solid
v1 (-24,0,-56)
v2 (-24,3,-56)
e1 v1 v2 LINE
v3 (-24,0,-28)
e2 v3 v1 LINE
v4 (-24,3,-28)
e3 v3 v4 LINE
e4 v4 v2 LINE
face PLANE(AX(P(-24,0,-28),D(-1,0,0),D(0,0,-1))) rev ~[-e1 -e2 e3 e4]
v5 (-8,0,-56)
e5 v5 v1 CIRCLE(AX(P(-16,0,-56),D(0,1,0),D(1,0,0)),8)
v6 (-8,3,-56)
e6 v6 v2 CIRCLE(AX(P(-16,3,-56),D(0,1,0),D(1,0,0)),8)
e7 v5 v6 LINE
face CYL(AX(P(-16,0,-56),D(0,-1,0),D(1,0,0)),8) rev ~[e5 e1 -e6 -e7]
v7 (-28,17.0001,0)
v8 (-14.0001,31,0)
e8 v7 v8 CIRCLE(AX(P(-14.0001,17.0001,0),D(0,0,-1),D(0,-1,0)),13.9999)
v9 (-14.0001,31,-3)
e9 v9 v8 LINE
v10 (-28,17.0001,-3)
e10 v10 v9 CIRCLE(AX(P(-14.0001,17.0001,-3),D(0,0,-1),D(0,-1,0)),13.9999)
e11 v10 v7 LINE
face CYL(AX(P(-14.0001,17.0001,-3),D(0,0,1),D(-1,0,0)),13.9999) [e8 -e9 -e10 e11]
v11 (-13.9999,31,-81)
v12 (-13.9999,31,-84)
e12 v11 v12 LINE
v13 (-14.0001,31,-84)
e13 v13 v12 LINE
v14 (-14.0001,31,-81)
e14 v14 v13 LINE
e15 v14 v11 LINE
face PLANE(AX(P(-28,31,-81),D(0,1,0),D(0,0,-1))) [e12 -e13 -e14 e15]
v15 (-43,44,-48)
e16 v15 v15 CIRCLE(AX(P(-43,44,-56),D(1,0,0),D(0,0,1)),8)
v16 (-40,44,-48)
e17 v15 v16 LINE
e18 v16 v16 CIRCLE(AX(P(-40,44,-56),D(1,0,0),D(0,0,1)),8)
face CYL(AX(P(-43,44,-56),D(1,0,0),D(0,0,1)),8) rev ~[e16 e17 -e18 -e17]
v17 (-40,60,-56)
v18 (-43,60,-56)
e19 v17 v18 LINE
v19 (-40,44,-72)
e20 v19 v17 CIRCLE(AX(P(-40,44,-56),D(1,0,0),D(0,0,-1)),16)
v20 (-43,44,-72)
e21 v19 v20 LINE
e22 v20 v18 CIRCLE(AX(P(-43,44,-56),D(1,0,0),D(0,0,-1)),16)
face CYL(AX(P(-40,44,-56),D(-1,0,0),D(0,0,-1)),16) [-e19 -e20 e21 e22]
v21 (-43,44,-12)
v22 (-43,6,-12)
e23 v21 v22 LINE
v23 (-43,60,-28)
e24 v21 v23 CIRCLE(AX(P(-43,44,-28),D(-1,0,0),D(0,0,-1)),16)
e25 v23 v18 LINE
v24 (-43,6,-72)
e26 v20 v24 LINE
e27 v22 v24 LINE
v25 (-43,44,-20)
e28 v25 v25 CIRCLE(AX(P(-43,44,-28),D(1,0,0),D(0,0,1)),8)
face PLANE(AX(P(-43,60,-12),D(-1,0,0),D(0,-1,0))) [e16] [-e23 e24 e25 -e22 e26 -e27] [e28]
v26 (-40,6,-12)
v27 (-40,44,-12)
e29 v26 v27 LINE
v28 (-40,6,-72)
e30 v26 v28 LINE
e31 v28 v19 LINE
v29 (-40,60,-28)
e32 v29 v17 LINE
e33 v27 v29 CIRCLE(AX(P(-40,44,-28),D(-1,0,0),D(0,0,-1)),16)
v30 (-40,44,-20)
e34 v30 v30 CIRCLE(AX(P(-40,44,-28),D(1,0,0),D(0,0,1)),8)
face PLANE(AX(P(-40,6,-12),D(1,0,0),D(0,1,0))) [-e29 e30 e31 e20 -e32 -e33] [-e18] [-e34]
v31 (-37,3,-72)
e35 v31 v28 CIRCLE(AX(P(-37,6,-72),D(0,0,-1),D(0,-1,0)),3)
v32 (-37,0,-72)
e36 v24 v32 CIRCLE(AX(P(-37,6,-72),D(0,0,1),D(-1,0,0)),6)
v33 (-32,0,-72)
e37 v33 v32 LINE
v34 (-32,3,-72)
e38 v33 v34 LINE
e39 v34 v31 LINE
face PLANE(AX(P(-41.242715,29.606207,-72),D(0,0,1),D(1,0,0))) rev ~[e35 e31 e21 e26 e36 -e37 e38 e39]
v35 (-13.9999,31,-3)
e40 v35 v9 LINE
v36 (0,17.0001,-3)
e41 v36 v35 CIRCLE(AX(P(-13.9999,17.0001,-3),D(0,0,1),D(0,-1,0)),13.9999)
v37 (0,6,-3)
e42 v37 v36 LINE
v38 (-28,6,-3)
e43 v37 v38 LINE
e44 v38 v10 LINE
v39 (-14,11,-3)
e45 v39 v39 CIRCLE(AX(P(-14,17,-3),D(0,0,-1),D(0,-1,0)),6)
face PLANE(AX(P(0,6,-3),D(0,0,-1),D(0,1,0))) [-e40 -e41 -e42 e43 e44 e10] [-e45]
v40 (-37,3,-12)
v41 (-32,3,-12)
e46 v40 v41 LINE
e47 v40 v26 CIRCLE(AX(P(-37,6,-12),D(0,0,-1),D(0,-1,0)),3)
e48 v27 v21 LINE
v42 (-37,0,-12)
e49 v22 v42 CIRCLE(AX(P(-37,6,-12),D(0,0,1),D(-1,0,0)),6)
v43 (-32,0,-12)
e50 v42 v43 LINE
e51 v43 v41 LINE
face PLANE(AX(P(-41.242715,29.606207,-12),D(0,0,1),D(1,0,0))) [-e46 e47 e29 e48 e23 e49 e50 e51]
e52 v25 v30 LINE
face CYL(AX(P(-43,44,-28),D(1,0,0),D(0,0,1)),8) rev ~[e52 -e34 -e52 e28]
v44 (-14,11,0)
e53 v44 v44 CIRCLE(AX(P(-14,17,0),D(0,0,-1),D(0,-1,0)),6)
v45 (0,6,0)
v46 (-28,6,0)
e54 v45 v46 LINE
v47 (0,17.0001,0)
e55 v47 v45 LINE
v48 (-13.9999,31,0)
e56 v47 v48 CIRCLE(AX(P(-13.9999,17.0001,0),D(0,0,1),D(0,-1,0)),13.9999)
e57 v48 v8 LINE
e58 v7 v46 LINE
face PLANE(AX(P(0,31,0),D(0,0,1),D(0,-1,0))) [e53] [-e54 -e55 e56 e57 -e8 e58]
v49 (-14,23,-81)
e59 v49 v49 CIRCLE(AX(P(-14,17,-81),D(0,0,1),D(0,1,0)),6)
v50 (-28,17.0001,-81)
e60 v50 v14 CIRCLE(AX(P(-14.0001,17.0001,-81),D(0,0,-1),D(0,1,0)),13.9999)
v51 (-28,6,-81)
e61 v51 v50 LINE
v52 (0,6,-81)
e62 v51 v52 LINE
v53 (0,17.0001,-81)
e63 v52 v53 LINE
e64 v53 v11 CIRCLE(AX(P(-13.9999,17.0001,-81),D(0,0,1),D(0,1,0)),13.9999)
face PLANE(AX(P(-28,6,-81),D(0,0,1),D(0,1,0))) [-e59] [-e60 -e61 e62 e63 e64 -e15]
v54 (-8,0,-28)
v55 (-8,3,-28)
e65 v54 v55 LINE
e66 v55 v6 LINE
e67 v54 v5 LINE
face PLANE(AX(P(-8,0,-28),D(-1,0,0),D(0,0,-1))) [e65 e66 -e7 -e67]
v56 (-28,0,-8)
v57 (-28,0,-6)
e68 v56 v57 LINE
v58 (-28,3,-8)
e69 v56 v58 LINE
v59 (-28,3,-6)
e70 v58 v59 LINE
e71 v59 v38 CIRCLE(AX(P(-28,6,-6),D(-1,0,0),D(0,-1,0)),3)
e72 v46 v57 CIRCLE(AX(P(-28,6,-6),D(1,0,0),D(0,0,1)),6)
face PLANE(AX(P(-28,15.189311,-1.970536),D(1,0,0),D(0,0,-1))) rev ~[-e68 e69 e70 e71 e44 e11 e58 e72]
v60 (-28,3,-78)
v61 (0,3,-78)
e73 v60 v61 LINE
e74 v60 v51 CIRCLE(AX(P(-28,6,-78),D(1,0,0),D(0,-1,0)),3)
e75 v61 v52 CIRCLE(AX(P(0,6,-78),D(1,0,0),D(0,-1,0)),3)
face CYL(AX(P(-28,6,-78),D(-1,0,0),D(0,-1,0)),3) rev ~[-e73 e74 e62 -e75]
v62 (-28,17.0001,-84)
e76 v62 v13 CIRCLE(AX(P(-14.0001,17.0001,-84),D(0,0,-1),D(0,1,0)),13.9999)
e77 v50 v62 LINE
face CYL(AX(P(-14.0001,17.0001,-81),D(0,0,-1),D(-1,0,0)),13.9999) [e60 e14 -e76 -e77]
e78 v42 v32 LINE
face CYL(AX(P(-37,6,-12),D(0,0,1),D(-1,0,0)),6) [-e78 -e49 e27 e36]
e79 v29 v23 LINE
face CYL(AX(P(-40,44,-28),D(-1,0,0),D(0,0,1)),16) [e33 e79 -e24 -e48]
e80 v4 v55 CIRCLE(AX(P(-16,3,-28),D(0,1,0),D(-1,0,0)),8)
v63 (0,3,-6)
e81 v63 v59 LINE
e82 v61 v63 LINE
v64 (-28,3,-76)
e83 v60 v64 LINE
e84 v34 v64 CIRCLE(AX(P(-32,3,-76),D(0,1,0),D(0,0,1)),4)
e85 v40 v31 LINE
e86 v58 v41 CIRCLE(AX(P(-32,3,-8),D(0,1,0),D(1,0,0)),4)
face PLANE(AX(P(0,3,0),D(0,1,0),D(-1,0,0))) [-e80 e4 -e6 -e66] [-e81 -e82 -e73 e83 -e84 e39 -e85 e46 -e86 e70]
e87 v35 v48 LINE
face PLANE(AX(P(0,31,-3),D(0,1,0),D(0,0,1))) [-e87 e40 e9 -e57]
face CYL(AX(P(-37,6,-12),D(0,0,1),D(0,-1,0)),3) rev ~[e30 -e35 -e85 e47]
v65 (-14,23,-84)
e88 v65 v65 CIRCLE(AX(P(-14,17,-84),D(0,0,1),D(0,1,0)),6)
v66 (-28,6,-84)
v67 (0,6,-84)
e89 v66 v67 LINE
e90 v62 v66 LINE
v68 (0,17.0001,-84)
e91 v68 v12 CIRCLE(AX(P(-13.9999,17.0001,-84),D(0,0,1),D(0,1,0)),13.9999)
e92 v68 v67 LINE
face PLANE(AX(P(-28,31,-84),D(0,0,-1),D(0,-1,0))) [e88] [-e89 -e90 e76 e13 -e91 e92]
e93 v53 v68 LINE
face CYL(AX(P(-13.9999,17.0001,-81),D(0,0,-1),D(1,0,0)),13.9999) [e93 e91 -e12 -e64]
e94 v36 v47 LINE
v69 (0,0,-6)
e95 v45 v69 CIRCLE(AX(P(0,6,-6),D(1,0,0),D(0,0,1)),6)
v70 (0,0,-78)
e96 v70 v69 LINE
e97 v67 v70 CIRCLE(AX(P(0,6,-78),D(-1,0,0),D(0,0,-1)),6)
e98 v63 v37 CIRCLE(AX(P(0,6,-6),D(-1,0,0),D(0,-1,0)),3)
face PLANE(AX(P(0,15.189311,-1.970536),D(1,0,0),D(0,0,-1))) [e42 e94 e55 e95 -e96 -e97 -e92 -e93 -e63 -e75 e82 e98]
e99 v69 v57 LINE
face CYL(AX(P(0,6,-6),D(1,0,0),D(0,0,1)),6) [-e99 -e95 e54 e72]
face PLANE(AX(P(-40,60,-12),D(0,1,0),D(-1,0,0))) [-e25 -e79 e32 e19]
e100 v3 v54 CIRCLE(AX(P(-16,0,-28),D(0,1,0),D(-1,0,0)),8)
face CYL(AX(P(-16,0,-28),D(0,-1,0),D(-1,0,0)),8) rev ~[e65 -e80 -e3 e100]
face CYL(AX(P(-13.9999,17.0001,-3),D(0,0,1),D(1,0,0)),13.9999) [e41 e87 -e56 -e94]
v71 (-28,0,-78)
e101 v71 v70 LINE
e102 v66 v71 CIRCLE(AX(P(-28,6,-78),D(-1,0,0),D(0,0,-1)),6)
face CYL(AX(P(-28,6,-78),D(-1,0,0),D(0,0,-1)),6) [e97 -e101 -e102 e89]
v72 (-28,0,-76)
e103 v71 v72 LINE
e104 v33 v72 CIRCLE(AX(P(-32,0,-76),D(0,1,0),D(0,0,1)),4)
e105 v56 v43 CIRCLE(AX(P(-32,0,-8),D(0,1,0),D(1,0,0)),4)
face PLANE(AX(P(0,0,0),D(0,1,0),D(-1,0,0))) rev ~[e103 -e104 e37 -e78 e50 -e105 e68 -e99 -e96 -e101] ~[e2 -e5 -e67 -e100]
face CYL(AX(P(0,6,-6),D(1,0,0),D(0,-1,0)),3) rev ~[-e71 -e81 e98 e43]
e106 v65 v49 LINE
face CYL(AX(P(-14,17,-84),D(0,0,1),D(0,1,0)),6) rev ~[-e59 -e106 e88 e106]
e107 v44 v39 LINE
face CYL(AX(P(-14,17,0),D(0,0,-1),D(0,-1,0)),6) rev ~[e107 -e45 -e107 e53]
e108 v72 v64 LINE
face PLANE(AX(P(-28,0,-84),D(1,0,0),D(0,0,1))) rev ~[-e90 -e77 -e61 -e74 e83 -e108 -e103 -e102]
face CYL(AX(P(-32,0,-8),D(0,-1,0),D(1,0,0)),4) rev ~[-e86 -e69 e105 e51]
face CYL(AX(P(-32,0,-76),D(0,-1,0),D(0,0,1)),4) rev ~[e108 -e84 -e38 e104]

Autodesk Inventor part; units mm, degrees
ref_plane "YZ Plane" through (0, 0, 0) normal (1, 0, 0) x (0, 1, 0)
ref_plane "XZ Plane" through (0, 0, 0) normal (0, 1, 0) x (-1, 0, 0)
ref_plane "XY Plane" through (0, 0, 0) normal (0, 0, 1) x (1, 0, 0)
sketch "Náčrt1" plane through (0, 0, 0) normal (0, 1, 0) x (-1, 0, 0)
  line L0 (0, 0) -> (28, 0)
  line L1 (43, -12) -> (43, -72)
  line L2 (28, -84) -> (0, -84)
  line L3 (0, -84) -> (0, 0)
  line L4 (43, -12) -> (32, -12)
  line L5 (28, -8) -> (28, 0)
  line L6 (28, -84) -> (28, -76)
  line L7 (32, -72) -> (43, -72)
  arc A0 (24, -28) -> (8, -28) centre (16, -28) ccw
  arc A1 (8, -56) -> (24, -56) centre (16, -56) ccw
  line L8 (24, -28) -> (24, -56)
  line L9 (8, -28) -> (8, -56)
  arc A2 (28, -8) -> (32, -12) centre (32, -8) ccw
  arc A3 (32, -72) -> (28, -76) centre (32, -76) ccw
  point P0 (28, -12)
  point P1 (28, -72)
  dimension "d3" = 15
  dimension "d4" = 12
  dimension "d5" = 84
  dimension "d6" = 43
  dimension "d7" = 60
  dimension "d10" = 16
  dimension "d11" = 16
  dimension "d12" = 28
  dimension "d13" = 16
  dimension "d15" = 4
extrude "Deska1" add sketch "Náčrt1" along normal blind 3
sketch "Náčrt2" plane through (0, 0, -3) normal (0, 0, 1) x (1, 0, 0)
  line L0 (-28, 0) -> (0, 0)
  line L1 (0, 0) -> (0, 31)
  line L2 (0, 31) -> (-28, 31)
  line L3 (-28, 31) -> (-28, 0)
edge flange "Obruba1" height 31 angle 90 thickness 3 bend radius 3 thickness toward (0, 0, 1) relief tear relief width 3 relief depth 1.5 corner gap 3 corner form 0 edges at (-14, 3, 0) (-14, 3, -84) wall of the first edge with corners at (-28, 0, -3) (0, 0, -3) (0, 31, -3) (-28, 31, -3)
bend "Ohyb1"
corner "Roh1"
fillet "Zaoblení rohu1" radius 14 4 edges at (-28, 31, -1.5) (0, 31, -1.5) (-28, 31, -82.5) (0, 31, -82.5)
sketch "Náčrt3" plane through (0, 6, -84) normal (0, 0, -1) x (-1, 0, 0)
  line L0 (28, -6) -> (0, -6) projected
  line L1 (28, 11) -> (28, 0) projected
  point P0 (14, 11)
  dimension "d27" = 17
  dimension "d28" = 14
hole "Díra1" at (-14, 17, -84) direction (0, 0, 1) diameter 12 depth 3 tip angle 118
sketch "Náčrt4" plane through (-28, 6, 0) normal (0, 0, 1) x (1, 0, 0)
  line L0 (28, -6) -> (0, -6) projected
  line L1 (28, 11) -> (28, 0) projected
  point P0 (14, 11)
  dimension "d36" = 17
  dimension "d37" = 14
hole "Díra2" at (-14, 17, 0) direction (0, 0, -1) diameter 12 depth 3 tip angle 118
sketch "Náčrt5" plane through (-40, 0, -12) normal (-1, 0, 0) x (0, -1, 0)
  line L0 (0, -60) -> (0, 0)
  line L1 (0, 0) -> (-60, 0)
  line L2 (-60, 0) -> (-60, -60)
  line L3 (-60, -60) -> (0, -60)
edge flange "Obruba2" height 60 angle 90 thickness 3 bend radius 3 thickness toward (-1, 0, 0) relief tear relief width 3 relief depth 1.5 edges at (-43, 3, -42) wall of the first edge with corners at (-40, 0, -72) (-40, 0, -12) (-40, 60, -12) (-40, 60, -72)
bend "Ohyb2"
corner "Roh2"
fillet "Zaoblení rohu2" radius 16 2 edges at (-41.5, 60, -72) (-41.5, 60, -12)
sketch "Náčrt6" plane through (-43, 6, -72) normal (-1, 0, 0) x (0, 0, 1)
  line L0 (60, -6) -> (0, -6) projected
  line L1 (0, 0) -> (0, 38) projected
  point P0 (72, -6)
  point P1 (16, 38)
  dimension "d56" = 44
  dimension "d57" = 16
hole "Díra3" at (-43, 44, -56) direction (1, 0, 0) diameter 16 depth 3 tip angle 118
sketch "Náčrt7" plane through (-43, 6, -72) normal (-1, 0, 0) x (0, 0, 1)
  line L0 (60, -6) -> (0, -6) projected
  line L1 (60, 38) -> (60, 0) projected
  point P0 (72, -6)
  point P1 (44, 38)
  dimension "d65" = 44
  dimension "d66" = 16
hole "Díra4" at (-43, 44, -28) direction (1, 0, 0) diameter 16 depth 3 tip angle 118
equation "\"d34\" = Tloušťka"
equation "\"d43\" = Tloušťka"
equation "\"d63\" = Tloušťka"
equation "\"d72\" = Tloušťka"
equation "\"d14\" = Tloušťka"
equation "\"d16\" = ŠířkaVýštipu"
equation "\"d17\" = HloubkaVýštipu"
equation "\"d18\" = MinimálníZbytek"
equation "\"d19\" = PřechodovýPoloměr"
equation "\"d22\" = PoloměrOhybu"
equation "\"d23\" = VelikostRohovéhoVýštipu"
equation "\"d24\" = VelikostMezery"
equation "\"d25\" = VelikostJacobihoPoloměru"
equation "\"d45\" = ŠířkaVýštipu"
equation "\"d46\" = HloubkaVýštipu"
equation "\"d47\" = MinimálníZbytek"
equation "\"d48\" = PřechodovýPoloměr"
equation "\"d51\" = PoloměrOhybu"
equation "\"d52\" = VelikostRohovéhoVýštipu"
equation "\"d53\" = VelikostMezery"
equation "\"d54\" = VelikostJacobihoPoloměru"
equation "\"PoloměrOhybu\" = Tloušťka"
equation "\"ŠířkaVýštipu\" = Tloušťka"
equation "\"HloubkaVýštipu\" = 0.5 * Tloušťka"
equation "\"VelikostRohovéhoVýštipu\" = 4 * Tloušťka"
equation "\"MinimálníZbytek\" = 2 * Tloušťka"
equation "\"PřechodovýPoloměr\" = PoloměrOhybu"
equation "\"VelikostJacobihoPoloměru\" = PoloměrOhybu"
equation "\"VelikostMezery\" = Tloušťka"
equation "\"Tloušťka\" = 3"
properties part number "26886-Vodička_Vojtěch_příklad-3"
